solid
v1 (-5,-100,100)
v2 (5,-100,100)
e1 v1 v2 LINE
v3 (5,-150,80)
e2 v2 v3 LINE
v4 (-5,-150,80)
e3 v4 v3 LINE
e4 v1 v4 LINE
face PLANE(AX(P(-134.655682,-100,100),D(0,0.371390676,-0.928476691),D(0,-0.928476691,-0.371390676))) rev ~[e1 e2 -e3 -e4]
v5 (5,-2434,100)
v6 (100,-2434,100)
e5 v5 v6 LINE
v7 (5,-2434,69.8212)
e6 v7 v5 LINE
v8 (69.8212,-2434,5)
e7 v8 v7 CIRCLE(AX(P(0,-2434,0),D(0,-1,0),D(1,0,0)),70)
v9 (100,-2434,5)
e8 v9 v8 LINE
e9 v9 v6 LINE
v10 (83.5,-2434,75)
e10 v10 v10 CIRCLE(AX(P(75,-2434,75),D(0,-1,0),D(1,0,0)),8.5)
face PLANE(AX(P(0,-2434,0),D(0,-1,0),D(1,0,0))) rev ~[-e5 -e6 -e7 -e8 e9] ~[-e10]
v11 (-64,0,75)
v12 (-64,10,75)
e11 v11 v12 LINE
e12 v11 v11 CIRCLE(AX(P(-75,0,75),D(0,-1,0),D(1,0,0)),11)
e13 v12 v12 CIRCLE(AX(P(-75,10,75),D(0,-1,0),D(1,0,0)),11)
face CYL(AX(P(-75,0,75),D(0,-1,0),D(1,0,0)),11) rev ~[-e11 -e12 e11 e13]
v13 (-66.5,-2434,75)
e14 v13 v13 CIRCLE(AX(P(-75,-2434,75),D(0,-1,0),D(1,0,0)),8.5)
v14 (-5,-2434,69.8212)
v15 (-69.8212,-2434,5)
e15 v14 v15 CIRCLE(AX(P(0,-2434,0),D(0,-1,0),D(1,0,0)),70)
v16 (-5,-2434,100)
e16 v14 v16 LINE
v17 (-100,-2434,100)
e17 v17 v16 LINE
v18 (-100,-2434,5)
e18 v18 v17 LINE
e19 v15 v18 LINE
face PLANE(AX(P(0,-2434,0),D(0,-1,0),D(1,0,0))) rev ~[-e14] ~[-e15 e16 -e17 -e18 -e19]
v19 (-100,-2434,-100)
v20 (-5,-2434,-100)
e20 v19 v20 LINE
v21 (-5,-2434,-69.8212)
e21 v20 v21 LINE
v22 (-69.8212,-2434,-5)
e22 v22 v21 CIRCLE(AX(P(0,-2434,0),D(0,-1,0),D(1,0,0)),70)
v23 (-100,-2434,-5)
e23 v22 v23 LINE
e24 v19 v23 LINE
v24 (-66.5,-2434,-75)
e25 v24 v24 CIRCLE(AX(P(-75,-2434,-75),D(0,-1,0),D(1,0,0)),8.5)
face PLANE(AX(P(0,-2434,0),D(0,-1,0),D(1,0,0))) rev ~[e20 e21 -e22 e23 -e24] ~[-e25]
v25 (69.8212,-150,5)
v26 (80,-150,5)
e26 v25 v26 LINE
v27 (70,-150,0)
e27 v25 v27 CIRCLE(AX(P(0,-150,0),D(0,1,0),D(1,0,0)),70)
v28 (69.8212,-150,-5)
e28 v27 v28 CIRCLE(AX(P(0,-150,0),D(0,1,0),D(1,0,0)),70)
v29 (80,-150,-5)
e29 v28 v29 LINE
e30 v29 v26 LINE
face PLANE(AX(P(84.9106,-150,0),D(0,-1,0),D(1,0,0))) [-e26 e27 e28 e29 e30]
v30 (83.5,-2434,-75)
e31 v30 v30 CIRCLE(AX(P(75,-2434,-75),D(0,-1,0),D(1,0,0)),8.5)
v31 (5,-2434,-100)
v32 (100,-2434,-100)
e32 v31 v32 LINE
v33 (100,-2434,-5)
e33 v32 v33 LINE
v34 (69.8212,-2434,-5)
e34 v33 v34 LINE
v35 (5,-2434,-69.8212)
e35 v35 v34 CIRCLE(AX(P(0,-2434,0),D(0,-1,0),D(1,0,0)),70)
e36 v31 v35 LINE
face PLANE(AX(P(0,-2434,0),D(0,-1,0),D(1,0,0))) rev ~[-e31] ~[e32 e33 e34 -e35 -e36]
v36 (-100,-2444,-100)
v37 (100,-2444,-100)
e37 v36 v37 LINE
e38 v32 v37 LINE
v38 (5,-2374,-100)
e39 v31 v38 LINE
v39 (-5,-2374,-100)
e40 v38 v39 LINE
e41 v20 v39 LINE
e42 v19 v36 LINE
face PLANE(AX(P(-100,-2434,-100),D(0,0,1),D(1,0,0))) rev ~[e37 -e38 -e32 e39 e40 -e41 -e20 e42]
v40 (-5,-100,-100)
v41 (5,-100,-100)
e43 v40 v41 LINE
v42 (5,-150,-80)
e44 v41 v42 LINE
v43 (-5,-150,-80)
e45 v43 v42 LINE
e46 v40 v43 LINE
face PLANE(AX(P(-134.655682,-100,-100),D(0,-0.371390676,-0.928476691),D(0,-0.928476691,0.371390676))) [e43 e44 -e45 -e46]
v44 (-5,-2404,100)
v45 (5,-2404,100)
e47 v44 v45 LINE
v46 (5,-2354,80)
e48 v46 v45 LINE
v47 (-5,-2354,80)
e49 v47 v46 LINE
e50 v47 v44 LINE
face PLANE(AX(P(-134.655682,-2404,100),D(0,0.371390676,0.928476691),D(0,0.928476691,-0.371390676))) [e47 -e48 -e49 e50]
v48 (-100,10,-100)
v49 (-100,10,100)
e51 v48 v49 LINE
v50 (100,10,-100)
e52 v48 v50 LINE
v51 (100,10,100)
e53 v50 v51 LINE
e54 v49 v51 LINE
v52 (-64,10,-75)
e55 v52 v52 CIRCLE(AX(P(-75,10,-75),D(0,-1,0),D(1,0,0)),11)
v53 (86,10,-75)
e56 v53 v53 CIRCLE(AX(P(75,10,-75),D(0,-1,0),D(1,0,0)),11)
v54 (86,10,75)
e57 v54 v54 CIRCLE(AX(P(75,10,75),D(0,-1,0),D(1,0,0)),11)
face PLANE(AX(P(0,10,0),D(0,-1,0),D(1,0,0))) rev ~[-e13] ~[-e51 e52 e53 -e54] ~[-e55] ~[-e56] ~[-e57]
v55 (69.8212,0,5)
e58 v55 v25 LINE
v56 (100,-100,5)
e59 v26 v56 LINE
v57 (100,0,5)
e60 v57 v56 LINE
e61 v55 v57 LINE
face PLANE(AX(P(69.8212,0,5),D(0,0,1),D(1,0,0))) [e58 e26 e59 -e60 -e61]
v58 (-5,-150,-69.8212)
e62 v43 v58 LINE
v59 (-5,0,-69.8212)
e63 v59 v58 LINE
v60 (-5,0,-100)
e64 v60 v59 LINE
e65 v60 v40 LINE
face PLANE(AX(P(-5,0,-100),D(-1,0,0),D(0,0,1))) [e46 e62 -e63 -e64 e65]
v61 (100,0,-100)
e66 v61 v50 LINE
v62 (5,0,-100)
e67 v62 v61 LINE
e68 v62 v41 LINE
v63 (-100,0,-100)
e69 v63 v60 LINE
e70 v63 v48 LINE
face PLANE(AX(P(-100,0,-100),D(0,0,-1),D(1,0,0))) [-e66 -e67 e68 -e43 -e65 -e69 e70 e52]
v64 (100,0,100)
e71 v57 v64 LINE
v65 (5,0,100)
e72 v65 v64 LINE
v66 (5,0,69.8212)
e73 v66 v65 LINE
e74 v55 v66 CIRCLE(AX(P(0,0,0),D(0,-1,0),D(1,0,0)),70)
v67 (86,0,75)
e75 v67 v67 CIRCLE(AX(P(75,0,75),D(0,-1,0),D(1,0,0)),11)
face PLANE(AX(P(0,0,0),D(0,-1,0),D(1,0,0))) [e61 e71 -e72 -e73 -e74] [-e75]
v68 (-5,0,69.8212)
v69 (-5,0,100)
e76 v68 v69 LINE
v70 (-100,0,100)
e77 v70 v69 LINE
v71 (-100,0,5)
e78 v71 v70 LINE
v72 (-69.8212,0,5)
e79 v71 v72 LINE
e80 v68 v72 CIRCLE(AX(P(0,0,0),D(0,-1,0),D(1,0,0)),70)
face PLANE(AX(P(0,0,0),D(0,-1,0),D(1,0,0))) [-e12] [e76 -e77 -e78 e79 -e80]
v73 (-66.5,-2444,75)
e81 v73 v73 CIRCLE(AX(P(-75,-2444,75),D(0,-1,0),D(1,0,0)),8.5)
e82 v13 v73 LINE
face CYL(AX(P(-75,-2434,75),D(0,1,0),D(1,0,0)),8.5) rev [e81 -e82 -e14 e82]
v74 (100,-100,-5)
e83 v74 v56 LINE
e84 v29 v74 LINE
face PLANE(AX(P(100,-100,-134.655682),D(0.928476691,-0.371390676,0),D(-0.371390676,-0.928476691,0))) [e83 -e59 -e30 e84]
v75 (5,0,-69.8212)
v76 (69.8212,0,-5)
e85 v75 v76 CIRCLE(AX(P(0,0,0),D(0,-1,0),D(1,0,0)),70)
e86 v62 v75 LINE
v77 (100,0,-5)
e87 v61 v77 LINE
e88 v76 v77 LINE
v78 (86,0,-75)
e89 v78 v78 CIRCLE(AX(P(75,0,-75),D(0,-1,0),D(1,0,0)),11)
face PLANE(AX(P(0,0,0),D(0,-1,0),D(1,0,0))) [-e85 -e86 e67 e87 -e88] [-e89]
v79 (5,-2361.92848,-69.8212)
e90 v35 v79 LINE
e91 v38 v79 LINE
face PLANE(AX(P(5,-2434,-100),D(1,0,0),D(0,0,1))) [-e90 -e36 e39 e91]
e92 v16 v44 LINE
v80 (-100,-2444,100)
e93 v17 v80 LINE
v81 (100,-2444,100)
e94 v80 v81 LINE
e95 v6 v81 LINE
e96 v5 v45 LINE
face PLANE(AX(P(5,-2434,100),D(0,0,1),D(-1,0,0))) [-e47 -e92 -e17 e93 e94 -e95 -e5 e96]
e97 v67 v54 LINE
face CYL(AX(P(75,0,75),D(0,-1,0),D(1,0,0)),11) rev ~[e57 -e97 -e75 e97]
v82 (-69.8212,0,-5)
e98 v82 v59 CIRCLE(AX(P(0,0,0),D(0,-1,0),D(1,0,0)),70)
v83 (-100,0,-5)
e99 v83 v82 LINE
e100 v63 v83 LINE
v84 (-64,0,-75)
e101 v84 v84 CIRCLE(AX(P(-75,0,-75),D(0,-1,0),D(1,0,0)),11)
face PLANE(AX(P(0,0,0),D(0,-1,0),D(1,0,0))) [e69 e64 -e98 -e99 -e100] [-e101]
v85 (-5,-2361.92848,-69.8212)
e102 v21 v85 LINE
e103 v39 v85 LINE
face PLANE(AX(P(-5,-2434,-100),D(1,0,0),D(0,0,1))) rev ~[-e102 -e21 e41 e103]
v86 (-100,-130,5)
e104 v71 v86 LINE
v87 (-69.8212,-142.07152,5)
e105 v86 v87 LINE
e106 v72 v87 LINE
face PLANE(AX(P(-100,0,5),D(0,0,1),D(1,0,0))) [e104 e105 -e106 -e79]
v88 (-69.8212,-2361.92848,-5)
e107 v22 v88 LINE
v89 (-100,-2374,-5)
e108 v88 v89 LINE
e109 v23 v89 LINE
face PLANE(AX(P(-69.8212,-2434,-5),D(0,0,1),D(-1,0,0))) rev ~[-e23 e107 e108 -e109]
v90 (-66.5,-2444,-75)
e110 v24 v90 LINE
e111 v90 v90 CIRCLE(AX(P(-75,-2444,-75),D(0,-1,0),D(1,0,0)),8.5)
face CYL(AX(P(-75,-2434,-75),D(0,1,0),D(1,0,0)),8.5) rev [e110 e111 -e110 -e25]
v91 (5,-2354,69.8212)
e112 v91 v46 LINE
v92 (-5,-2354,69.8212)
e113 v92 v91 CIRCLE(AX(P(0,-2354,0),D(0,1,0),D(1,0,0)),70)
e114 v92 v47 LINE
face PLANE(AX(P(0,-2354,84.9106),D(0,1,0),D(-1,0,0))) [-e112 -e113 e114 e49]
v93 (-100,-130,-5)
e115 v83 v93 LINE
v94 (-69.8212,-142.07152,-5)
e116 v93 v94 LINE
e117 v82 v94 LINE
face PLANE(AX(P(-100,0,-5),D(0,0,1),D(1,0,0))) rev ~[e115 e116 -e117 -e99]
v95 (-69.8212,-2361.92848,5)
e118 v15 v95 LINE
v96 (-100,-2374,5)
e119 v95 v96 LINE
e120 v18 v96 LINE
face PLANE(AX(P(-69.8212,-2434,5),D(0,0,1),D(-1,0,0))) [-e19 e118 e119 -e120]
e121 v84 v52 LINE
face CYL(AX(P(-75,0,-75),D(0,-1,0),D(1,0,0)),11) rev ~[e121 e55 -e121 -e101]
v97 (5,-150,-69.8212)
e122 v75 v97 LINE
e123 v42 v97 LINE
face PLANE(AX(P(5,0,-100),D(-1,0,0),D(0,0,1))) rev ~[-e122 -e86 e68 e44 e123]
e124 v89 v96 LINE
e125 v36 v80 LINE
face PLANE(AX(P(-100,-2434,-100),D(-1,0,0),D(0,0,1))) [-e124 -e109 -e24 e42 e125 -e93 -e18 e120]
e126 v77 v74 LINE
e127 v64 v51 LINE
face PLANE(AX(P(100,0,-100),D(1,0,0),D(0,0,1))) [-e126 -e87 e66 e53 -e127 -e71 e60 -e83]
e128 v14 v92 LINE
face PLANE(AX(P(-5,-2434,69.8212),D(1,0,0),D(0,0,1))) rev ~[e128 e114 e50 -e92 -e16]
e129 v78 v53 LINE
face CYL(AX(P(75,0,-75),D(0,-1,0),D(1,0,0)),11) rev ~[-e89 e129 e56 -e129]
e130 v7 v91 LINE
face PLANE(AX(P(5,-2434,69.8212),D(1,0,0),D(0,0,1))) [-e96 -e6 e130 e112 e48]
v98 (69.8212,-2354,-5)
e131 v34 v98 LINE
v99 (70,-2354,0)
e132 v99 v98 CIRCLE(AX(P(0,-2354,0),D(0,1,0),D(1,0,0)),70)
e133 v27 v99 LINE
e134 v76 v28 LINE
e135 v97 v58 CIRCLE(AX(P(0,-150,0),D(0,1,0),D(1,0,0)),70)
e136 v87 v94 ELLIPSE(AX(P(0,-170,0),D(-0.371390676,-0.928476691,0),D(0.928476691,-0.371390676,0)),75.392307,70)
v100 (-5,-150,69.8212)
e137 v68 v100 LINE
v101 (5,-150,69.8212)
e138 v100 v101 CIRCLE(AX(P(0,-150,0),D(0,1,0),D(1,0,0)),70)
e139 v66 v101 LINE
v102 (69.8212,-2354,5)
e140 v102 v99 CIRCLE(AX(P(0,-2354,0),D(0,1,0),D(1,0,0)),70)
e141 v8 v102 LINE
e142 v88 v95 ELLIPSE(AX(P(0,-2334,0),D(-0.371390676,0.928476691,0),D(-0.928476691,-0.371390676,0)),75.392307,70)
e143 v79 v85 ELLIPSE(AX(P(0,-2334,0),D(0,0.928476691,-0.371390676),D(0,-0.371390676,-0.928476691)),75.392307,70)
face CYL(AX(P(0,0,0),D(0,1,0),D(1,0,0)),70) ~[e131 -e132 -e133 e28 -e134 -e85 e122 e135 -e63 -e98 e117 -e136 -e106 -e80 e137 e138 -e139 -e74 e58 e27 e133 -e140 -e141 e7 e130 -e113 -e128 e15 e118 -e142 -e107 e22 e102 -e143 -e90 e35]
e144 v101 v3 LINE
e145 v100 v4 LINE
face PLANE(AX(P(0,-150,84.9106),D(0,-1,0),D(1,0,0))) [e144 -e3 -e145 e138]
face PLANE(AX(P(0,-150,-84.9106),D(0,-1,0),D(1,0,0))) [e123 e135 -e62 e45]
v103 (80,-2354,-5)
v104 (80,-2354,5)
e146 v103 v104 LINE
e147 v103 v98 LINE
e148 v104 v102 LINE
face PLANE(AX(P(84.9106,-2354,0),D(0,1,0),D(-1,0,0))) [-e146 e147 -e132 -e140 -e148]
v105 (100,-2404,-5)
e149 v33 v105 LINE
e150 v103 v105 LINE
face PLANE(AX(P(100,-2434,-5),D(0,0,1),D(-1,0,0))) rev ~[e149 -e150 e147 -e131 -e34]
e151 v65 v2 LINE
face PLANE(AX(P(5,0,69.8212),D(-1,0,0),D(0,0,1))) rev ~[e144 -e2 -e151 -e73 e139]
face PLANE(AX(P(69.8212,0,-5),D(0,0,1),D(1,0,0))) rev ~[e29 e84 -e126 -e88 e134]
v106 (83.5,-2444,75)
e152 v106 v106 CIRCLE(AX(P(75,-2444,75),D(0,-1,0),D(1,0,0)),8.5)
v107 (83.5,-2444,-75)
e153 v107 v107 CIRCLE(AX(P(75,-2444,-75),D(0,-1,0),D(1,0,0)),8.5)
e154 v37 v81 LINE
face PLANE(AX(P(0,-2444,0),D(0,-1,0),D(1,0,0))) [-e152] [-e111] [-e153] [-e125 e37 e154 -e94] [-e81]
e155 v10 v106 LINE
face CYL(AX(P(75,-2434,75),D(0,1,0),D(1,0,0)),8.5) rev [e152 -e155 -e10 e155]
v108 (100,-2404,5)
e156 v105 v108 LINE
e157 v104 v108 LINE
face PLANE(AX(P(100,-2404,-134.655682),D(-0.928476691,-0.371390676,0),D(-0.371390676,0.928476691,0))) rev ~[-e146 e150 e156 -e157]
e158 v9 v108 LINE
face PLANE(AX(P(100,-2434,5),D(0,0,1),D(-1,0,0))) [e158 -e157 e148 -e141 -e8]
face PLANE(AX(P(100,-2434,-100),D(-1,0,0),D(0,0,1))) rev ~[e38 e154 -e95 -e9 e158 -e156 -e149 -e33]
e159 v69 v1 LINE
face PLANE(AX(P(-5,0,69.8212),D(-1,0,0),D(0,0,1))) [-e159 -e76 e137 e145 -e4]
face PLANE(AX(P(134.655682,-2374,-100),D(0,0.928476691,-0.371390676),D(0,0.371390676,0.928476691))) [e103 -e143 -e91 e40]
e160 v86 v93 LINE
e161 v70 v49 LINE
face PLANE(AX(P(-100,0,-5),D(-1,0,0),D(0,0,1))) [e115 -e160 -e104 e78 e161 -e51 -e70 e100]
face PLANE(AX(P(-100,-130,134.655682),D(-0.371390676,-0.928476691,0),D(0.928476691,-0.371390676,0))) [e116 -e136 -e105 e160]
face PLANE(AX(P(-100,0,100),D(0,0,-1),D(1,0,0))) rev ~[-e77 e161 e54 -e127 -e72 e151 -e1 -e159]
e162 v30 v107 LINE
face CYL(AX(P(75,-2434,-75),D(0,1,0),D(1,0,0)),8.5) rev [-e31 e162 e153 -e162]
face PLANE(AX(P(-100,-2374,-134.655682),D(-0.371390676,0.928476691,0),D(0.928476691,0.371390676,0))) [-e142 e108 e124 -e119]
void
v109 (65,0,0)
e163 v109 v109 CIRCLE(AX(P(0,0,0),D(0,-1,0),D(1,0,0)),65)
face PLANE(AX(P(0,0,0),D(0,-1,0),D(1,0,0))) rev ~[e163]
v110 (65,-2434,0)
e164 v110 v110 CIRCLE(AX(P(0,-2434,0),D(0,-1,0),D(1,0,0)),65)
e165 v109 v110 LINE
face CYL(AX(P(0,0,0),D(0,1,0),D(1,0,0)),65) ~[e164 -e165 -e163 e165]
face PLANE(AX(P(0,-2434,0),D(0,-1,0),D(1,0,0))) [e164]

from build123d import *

# Parameters (mm, degrees)
F0_R          = 70
F0_R_2        = 65
F1_DEPTH      = 2434
F2_W          = 200
F2_H          = 200
F2_R          = 11
F3_DEPTH      = 10
F4_W          = 30.1787997812
F4_H          = 10
F4_W_2        = 10
F4_H_2        = 30.1787997812
F5_DEPTH      = 150
F6_T1_DEPTH   = 269.311363913
F6_T3_DEPTH   = 269.311363913
F6_T8_DEPTH   = 269.311363913
F6_S9_R       = 70
F6_T10_DEPTH  = 139
F8_W          = 200
F8_H          = 200
F8_R          = 8.5
F9_DEPTH      = 10
F10_W         = 10
F10_H         = 30.1787997812
F10_W_2       = 30.1787997812
F10_H_2       = 10
F11_DEPTH     = 80
F12_T1_DEPTH  = 269.311363913
F12_T3_DEPTH  = 269.311363913
F12_T8_DEPTH  = 269.311363913
F12_S9_R      = 70
F12_T10_DEPTH = 139
F12_T14_DEPTH = 269.311363913
F12_S15_R     = 70
F12_T16_DEPTH = 139


# Not quite as in the source:
# - a fillet or chamfer that OpenCascade refuses, or shapes differently, is made with other operations: its cross-section is extruded or revolved along the edge and cut away or added


with BuildPart() as f1:
    # F0 (on Front) → F1 (new body)
    with BuildSketch(Plane.XZ):
        Circle(F0_R)
        Circle(F0_R_2, mode=Mode.SUBTRACT)
    extrude(amount=F1_DEPTH)

    # F2 (on Front) → F3 (join)
    with BuildSketch(Plane.XZ):
        Rectangle(F2_W, F2_H)
        with Locations((-75, -75)):
            Circle(F2_R, mode=Mode.SUBTRACT)
        with Locations((75, -75)):
            Circle(F2_R, mode=Mode.SUBTRACT)
        with Locations((-75, 75)):
            Circle(F2_R, mode=Mode.SUBTRACT)
        with Locations((75, 75)):
            Circle(F2_R, mode=Mode.SUBTRACT)
    extrude(amount=-F3_DEPTH)

    # F4 (on Front) → F5 (join)
    with BuildSketch(Plane.XZ):
        with Locations((-84.9106001094, 0)):
            Rectangle(F4_W, F4_H)
        with Locations((0, 84.9106001094)):
            Rectangle(F4_W_2, F4_H_2)
        with Locations((84.9106001094, 0)):
            Rectangle(F4_W, F4_H)
        with Locations((0, -84.9106001094)):
            Rectangle(F4_W_2, F4_H_2)
    extrude(amount=F5_DEPTH)

    # F6: chamfer of 50 x 20 on 4 edges, made by hand

    # F6_s2 → F6_t1 (cut)
    with BuildSketch(Plane.YZ.offset(-134.6556819565)):
        Polygon((-100, 100), (-150, 80), (-150, 100), align=None)
        Polygon((-100, -100), (-150, -80), (-150, -100), align=None)
    extrude(amount=F6_T1_DEPTH, mode=Mode.SUBTRACT)

    # F6_s4 → F6_t3 (cut)
    with BuildSketch(Plane.XY.offset(-134.6556819565)):
        Polygon((100, -100), (80, -150), (100, -150), align=None)
    extrude(amount=F6_T3_DEPTH, mode=Mode.SUBTRACT)


with BuildPart() as f6_tool6:
    # F6_s7 → F6_t8 (new body)
    with BuildSketch(Plane.XY.offset(134.6556819565)):
        Polygon((-100, -130), (-50, -150), (-100, -150), align=None)
    extrude(amount=-F6_T8_DEPTH)

    # F6_s9 → F6_t10 (cut, symmetric)
    with BuildSketch(Plane.XZ.offset(140)):
        Circle(F6_S9_R)
    extrude(amount=F6_T10_DEPTH, both=True, mode=Mode.SUBTRACT)


with BuildPart() as f1_1:
    add(f1.part)

    # F6_t5: cut F6_tool6
    add(f6_tool6.part, mode=Mode.SUBTRACT)

    # F8 (on offset) → F9 (join)
    with BuildSketch(Plane.XZ.offset(2434)):
        Rectangle(F8_W, F8_H)
        with Locations((-75, -75)):
            Circle(F8_R, mode=Mode.SUBTRACT)
        with Locations((75, -75)):
            Circle(F8_R, mode=Mode.SUBTRACT)
        with Locations((-75, 75)):
            Circle(F8_R, mode=Mode.SUBTRACT)
        with Locations((75, 75)):
            Circle(F8_R, mode=Mode.SUBTRACT)
    extrude(amount=F9_DEPTH)

    # F10 (on face) → F11 (join)
    with BuildSketch(Plane(origin=(0, -2434, 0), x_dir=(-1, 0, 0), z_dir=(0, 1, 0))):
        with Locations((0, 84.9106001094)):
            Rectangle(F10_W, F10_H)
        with Locations((84.9106001094, 0)):
            Rectangle(F10_W_2, F10_H_2)
        with Locations((0, -84.9106001094)):
            Rectangle(F10_W, F10_H)
        with Locations((-84.9106001094, 0)):
            Rectangle(F10_W_2, F10_H_2)
    extrude(amount=F11_DEPTH)

    # F12: chamfer of 20 x 50 on 4 edges, made by hand

    # F12_s2 → F12_t1 (cut)
    with BuildSketch(Plane.YZ.offset(-134.6556819565)):
        Polygon((-2404, 100), (-2354, 80), (-2354, 100), align=None)
    extrude(amount=F12_T1_DEPTH, mode=Mode.SUBTRACT)

    # F12_s4 → F12_t3 (cut)
    with BuildSketch(Plane.XY.offset(-134.6556819565)):
        Polygon((100, -2404), (80, -2354), (100, -2354), align=None)
    extrude(amount=F12_T3_DEPTH, mode=Mode.SUBTRACT)


with BuildPart() as f12_tool6:
    # F12_s7 → F12_t8 (new body)
    with BuildSketch(Plane.XY.offset(-134.6556819565)):
        Polygon((-100, -2374), (-50, -2354), (-100, -2354), align=None)
    extrude(amount=F12_T8_DEPTH)

    # F12_s9 → F12_t10 (cut, symmetric)
    with BuildSketch(Plane.XZ.offset(2364)):
        Circle(F12_S9_R)
    extrude(amount=F12_T10_DEPTH, both=True, mode=Mode.SUBTRACT)


with BuildPart() as f1_2:
    add(f1_1.part)

    # F12_t5: cut F12_tool6
    add(f12_tool6.part, mode=Mode.SUBTRACT)


with BuildPart() as f12_tool12:
    # F12_s13 → F12_t14 (new body)
    with BuildSketch(Plane.YZ.offset(134.6556819565)):
        Polygon((-2374, -100), (-2354, -50), (-2354, -100), align=None)
    extrude(amount=-F12_T14_DEPTH)

    # F12_s15 → F12_t16 (cut, symmetric)
    with BuildSketch(Plane.XZ.offset(2364)):
        Circle(F12_S15_R)
    extrude(amount=F12_T16_DEPTH, both=True, mode=Mode.SUBTRACT)


with BuildPart() as f1_3:
    add(f1_2.part)

    # F12_t11: cut F12_tool12
    add(f12_tool12.part, mode=Mode.SUBTRACT)


solid = f1_3.part
